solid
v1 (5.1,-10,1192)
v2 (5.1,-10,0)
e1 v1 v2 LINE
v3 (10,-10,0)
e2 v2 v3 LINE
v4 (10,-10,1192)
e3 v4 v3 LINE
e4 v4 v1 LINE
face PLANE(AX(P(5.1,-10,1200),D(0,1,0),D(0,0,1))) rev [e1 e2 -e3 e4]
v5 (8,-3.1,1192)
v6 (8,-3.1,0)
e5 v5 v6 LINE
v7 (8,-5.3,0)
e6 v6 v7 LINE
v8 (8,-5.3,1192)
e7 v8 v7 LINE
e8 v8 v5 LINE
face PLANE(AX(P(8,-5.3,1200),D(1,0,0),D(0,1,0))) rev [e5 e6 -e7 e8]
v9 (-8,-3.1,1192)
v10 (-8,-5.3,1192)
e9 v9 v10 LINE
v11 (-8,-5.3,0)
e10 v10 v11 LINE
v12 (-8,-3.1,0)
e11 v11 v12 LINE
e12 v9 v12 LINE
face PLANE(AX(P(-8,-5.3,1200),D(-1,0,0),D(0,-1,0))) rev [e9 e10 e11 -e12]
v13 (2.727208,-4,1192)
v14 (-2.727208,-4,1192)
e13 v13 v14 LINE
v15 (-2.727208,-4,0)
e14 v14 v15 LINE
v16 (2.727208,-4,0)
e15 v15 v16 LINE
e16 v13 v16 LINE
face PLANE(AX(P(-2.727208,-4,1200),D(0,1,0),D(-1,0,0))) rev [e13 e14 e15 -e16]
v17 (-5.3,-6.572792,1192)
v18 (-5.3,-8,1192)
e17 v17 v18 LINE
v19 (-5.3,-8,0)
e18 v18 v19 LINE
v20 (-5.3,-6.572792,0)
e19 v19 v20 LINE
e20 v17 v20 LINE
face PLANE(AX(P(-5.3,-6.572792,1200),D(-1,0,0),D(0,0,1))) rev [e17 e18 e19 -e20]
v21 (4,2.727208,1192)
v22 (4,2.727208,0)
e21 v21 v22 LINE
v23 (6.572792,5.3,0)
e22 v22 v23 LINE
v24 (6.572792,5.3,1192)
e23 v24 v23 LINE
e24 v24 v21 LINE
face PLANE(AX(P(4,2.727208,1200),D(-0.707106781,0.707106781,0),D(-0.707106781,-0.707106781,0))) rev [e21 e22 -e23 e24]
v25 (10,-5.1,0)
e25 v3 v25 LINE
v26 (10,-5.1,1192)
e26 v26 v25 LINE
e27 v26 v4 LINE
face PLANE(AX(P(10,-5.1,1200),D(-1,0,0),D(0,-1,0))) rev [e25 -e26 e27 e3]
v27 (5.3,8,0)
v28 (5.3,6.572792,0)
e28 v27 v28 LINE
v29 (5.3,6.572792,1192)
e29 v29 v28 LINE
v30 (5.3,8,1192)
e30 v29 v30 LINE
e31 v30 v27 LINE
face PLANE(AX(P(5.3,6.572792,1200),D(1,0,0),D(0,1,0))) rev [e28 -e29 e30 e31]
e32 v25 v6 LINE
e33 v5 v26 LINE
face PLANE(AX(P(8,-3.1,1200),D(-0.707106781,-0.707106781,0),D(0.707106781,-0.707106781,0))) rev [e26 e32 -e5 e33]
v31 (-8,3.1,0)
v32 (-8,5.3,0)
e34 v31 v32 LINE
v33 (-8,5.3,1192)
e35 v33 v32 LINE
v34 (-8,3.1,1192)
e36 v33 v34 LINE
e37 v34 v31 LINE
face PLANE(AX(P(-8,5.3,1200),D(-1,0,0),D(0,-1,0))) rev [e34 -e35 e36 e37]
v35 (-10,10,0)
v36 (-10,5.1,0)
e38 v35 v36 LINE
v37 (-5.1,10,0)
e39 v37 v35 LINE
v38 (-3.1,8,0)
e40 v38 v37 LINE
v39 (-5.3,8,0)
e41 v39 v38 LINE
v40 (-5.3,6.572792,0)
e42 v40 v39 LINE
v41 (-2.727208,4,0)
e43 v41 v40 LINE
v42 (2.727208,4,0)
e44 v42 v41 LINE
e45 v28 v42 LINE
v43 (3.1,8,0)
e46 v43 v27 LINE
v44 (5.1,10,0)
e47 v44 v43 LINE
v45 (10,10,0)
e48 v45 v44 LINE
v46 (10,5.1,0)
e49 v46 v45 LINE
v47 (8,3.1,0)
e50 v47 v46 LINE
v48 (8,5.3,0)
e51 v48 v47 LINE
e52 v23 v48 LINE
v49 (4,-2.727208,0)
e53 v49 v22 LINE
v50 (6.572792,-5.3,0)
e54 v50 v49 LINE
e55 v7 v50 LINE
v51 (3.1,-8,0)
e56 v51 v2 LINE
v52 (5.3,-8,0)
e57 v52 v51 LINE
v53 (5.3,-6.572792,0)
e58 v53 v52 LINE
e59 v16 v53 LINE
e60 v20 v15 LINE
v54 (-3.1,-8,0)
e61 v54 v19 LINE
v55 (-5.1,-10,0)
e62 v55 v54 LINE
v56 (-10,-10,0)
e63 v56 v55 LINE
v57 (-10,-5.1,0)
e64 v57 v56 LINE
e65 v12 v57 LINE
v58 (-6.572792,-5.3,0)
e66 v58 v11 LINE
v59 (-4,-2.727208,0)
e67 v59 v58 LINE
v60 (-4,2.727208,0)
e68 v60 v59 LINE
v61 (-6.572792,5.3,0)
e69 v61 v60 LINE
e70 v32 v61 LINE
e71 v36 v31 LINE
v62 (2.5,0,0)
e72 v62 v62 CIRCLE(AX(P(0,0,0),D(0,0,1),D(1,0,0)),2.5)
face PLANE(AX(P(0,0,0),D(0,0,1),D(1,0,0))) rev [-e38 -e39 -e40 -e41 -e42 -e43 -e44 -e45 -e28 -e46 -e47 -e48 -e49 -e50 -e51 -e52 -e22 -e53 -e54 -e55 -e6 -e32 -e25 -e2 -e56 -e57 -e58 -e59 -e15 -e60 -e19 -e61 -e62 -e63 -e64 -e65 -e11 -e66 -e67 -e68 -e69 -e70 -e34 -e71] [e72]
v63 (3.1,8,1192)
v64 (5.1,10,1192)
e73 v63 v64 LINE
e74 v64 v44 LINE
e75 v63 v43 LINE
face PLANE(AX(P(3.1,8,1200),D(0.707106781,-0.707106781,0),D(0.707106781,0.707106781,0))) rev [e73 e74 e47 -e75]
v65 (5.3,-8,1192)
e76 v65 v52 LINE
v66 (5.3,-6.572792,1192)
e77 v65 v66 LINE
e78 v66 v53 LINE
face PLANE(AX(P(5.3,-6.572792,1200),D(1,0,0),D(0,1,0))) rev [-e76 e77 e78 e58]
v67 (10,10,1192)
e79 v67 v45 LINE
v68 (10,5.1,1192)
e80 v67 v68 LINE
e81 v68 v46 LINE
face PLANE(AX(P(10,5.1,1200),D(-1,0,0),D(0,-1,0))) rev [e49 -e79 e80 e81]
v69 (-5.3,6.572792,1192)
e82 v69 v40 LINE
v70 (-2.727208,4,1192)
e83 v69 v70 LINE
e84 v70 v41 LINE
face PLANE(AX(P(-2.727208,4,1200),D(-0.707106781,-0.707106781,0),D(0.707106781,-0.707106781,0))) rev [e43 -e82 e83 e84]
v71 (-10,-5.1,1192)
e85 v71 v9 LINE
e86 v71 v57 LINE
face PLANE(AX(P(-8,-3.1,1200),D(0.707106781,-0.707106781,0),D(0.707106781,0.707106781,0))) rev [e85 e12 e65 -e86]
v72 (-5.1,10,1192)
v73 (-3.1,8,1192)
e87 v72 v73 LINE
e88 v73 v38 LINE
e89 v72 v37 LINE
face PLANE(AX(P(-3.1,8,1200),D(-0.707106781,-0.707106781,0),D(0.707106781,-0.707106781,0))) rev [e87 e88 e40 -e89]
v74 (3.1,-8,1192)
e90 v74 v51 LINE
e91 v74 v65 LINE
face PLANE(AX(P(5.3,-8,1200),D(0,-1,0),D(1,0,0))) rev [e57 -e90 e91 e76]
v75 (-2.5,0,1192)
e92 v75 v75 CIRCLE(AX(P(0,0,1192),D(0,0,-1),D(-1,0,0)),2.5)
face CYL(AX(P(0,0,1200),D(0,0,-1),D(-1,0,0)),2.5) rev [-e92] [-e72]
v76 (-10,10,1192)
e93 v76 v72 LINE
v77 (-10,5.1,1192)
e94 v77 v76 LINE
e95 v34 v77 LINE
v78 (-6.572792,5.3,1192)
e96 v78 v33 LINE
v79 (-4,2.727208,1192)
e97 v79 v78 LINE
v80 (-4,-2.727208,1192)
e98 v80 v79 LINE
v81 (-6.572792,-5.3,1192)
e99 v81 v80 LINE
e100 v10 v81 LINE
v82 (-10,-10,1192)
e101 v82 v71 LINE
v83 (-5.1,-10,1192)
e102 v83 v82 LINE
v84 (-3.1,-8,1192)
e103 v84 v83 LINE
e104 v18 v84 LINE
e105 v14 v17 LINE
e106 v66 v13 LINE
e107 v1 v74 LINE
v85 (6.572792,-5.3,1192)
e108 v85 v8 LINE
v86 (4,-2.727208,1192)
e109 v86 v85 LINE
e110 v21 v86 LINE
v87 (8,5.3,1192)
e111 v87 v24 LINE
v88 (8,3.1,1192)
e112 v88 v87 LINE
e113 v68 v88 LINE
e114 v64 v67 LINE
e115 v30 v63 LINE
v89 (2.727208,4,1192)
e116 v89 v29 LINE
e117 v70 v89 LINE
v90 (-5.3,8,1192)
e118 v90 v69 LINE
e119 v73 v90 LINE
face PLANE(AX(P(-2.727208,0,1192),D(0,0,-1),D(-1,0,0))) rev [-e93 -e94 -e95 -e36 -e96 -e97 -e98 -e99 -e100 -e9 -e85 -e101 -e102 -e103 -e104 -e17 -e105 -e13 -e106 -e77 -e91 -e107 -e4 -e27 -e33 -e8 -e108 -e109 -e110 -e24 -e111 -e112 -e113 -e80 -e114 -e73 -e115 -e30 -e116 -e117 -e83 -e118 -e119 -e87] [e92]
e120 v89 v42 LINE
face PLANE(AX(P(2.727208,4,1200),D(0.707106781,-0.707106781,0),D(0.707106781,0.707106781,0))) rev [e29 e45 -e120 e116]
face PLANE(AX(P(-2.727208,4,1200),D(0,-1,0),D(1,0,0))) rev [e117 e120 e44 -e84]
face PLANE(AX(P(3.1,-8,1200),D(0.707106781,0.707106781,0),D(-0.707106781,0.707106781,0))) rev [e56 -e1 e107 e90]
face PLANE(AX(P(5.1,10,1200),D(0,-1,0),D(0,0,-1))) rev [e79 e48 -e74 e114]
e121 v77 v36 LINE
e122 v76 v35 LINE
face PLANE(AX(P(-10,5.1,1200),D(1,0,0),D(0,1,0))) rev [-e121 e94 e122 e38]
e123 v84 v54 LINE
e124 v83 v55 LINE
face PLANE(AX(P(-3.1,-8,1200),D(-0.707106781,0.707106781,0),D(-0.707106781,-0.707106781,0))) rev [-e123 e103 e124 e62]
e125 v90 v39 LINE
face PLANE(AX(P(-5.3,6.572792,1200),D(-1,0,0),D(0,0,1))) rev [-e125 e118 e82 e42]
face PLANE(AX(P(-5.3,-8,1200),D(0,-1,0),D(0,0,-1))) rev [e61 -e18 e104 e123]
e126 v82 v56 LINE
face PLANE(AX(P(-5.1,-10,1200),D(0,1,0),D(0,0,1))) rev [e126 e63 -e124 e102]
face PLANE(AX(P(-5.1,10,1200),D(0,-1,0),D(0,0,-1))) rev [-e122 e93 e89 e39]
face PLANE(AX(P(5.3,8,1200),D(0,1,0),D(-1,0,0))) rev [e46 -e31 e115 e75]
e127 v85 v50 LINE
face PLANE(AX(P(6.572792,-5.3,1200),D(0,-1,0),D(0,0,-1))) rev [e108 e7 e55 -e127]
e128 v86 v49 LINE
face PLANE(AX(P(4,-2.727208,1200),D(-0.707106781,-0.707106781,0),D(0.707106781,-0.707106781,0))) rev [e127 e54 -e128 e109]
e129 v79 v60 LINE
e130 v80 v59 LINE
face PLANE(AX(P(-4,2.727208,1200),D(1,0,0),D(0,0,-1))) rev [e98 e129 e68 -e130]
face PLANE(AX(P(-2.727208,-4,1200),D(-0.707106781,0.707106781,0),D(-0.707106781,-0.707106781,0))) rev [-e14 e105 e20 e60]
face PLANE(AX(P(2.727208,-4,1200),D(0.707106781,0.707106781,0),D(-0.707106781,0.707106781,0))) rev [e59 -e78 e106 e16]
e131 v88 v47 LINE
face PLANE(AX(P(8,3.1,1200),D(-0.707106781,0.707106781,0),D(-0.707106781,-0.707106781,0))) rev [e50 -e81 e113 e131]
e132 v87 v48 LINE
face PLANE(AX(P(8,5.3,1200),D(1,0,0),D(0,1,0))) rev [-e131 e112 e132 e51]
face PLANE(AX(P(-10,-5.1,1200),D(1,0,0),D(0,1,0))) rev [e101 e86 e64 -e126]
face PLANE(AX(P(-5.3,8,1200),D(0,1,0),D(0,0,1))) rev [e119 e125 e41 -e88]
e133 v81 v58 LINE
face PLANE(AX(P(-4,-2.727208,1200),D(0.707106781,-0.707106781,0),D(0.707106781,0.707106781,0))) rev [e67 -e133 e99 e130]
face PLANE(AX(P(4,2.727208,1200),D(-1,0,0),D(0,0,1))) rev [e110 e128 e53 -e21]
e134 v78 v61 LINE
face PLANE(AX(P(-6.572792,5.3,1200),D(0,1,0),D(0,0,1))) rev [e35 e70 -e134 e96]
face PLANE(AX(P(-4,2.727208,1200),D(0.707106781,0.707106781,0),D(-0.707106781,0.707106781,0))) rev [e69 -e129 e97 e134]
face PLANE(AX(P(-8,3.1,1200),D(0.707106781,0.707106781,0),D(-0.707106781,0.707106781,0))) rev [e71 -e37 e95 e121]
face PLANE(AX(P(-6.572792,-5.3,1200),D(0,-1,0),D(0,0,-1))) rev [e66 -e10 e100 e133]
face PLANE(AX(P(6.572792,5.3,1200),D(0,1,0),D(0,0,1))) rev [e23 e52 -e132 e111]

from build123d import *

# Parameters (mm, degrees)
SKETCH1_R              = 2.5
BOSS_EXTRUDE1_DEPTH    = 1200
CUT_REVOLVE1_START     = 1192
CUT_REVOLVE1_OUTLINE_R = 2.5
CUT_REVOLVE1_DEPTH     = 8


# Read off the part's stored shape, not the designer's step: Cut-Revolve1
with BuildPart() as part:
    # Sketch1 → Boss-Extrude1 (new body)
    with BuildSketch(Plane.XY):
        Polygon((-2.727207794, 4), (2.727207794, 4), (5.3, 6.572792206), (5.3, 8), (3.1, 8), (5.1, 10), (10, 10), (10, 5.1), (8, 3.1), (8, 5.3), (6.572792206, 5.3), (4, 2.727207794), (4, -2.727207794), (6.572792206, -5.3), (8, -5.3), (8, -3.1), (10, -5.1), (10, -10), (5.1, -10), (3.1, -8), (5.3, -8), (5.3, -6.572792206), (2.727207794, -4), (-2.727207794, -4), (-5.3, -6.572792206), (-5.3, -8), (-3.1, -8), (-5.1, -10), (-10, -10), (-10, -5.1), (-8, -3.1), (-8, -5.3), (-6.572792206, -5.3), (-4, -2.727207794), (-4, 2.727207794), (-6.572792206, 5.3), (-8, 5.3), (-8, 3.1), (-10, 5.1), (-10, 10), (-5.1, 10), (-3.1, 8), (-5.3, 8), (-5.3, 6.572792206), align=None)
        Circle(SKETCH1_R, mode=Mode.SUBTRACT)
    extrude(amount=BOSS_EXTRUDE1_DEPTH)

    # Cut-Revolve1 outline → Cut-Revolve1 (cut)
    with BuildSketch(Plane.XY.offset(CUT_REVOLVE1_START)):
        Polygon((4, 2.727207794), (6.572792206, 5.3), (8, 5.3), (8, 3.1), (10, 5.1), (10, 10), (5.1, 10), (3.1, 8), (5.3, 8), (5.3, 6.572792206), (2.727207794, 4), (-2.727207794, 4), (-5.3, 6.572792206), (-5.3, 8), (-3.1, 8), (-5.1, 10), (-10, 10), (-10, 5.1), (-8, 3.1), (-8, 5.3), (-6.572792206, 5.3), (-4, 2.727207794), (-4, -2.727207794), (-6.572792206, -5.3), (-8, -5.3), (-8, -3.1), (-10, -5.1), (-10, -10), (-5.1, -10), (-3.1, -8), (-5.3, -8), (-5.3, -6.572792206), (-2.727207794, -4), (2.727207794, -4), (5.3, -6.572792206), (5.3, -8), (3.1, -8), (5.1, -10), (10, -10), (10, -5.1), (8, -3.1), (8, -5.3), (6.572792206, -5.3), (4, -2.727207794), align=None)
        Circle(CUT_REVOLVE1_OUTLINE_R, mode=Mode.SUBTRACT)
    extrude(amount=CUT_REVOLVE1_DEPTH, mode=Mode.SUBTRACT)


solid = part.part
